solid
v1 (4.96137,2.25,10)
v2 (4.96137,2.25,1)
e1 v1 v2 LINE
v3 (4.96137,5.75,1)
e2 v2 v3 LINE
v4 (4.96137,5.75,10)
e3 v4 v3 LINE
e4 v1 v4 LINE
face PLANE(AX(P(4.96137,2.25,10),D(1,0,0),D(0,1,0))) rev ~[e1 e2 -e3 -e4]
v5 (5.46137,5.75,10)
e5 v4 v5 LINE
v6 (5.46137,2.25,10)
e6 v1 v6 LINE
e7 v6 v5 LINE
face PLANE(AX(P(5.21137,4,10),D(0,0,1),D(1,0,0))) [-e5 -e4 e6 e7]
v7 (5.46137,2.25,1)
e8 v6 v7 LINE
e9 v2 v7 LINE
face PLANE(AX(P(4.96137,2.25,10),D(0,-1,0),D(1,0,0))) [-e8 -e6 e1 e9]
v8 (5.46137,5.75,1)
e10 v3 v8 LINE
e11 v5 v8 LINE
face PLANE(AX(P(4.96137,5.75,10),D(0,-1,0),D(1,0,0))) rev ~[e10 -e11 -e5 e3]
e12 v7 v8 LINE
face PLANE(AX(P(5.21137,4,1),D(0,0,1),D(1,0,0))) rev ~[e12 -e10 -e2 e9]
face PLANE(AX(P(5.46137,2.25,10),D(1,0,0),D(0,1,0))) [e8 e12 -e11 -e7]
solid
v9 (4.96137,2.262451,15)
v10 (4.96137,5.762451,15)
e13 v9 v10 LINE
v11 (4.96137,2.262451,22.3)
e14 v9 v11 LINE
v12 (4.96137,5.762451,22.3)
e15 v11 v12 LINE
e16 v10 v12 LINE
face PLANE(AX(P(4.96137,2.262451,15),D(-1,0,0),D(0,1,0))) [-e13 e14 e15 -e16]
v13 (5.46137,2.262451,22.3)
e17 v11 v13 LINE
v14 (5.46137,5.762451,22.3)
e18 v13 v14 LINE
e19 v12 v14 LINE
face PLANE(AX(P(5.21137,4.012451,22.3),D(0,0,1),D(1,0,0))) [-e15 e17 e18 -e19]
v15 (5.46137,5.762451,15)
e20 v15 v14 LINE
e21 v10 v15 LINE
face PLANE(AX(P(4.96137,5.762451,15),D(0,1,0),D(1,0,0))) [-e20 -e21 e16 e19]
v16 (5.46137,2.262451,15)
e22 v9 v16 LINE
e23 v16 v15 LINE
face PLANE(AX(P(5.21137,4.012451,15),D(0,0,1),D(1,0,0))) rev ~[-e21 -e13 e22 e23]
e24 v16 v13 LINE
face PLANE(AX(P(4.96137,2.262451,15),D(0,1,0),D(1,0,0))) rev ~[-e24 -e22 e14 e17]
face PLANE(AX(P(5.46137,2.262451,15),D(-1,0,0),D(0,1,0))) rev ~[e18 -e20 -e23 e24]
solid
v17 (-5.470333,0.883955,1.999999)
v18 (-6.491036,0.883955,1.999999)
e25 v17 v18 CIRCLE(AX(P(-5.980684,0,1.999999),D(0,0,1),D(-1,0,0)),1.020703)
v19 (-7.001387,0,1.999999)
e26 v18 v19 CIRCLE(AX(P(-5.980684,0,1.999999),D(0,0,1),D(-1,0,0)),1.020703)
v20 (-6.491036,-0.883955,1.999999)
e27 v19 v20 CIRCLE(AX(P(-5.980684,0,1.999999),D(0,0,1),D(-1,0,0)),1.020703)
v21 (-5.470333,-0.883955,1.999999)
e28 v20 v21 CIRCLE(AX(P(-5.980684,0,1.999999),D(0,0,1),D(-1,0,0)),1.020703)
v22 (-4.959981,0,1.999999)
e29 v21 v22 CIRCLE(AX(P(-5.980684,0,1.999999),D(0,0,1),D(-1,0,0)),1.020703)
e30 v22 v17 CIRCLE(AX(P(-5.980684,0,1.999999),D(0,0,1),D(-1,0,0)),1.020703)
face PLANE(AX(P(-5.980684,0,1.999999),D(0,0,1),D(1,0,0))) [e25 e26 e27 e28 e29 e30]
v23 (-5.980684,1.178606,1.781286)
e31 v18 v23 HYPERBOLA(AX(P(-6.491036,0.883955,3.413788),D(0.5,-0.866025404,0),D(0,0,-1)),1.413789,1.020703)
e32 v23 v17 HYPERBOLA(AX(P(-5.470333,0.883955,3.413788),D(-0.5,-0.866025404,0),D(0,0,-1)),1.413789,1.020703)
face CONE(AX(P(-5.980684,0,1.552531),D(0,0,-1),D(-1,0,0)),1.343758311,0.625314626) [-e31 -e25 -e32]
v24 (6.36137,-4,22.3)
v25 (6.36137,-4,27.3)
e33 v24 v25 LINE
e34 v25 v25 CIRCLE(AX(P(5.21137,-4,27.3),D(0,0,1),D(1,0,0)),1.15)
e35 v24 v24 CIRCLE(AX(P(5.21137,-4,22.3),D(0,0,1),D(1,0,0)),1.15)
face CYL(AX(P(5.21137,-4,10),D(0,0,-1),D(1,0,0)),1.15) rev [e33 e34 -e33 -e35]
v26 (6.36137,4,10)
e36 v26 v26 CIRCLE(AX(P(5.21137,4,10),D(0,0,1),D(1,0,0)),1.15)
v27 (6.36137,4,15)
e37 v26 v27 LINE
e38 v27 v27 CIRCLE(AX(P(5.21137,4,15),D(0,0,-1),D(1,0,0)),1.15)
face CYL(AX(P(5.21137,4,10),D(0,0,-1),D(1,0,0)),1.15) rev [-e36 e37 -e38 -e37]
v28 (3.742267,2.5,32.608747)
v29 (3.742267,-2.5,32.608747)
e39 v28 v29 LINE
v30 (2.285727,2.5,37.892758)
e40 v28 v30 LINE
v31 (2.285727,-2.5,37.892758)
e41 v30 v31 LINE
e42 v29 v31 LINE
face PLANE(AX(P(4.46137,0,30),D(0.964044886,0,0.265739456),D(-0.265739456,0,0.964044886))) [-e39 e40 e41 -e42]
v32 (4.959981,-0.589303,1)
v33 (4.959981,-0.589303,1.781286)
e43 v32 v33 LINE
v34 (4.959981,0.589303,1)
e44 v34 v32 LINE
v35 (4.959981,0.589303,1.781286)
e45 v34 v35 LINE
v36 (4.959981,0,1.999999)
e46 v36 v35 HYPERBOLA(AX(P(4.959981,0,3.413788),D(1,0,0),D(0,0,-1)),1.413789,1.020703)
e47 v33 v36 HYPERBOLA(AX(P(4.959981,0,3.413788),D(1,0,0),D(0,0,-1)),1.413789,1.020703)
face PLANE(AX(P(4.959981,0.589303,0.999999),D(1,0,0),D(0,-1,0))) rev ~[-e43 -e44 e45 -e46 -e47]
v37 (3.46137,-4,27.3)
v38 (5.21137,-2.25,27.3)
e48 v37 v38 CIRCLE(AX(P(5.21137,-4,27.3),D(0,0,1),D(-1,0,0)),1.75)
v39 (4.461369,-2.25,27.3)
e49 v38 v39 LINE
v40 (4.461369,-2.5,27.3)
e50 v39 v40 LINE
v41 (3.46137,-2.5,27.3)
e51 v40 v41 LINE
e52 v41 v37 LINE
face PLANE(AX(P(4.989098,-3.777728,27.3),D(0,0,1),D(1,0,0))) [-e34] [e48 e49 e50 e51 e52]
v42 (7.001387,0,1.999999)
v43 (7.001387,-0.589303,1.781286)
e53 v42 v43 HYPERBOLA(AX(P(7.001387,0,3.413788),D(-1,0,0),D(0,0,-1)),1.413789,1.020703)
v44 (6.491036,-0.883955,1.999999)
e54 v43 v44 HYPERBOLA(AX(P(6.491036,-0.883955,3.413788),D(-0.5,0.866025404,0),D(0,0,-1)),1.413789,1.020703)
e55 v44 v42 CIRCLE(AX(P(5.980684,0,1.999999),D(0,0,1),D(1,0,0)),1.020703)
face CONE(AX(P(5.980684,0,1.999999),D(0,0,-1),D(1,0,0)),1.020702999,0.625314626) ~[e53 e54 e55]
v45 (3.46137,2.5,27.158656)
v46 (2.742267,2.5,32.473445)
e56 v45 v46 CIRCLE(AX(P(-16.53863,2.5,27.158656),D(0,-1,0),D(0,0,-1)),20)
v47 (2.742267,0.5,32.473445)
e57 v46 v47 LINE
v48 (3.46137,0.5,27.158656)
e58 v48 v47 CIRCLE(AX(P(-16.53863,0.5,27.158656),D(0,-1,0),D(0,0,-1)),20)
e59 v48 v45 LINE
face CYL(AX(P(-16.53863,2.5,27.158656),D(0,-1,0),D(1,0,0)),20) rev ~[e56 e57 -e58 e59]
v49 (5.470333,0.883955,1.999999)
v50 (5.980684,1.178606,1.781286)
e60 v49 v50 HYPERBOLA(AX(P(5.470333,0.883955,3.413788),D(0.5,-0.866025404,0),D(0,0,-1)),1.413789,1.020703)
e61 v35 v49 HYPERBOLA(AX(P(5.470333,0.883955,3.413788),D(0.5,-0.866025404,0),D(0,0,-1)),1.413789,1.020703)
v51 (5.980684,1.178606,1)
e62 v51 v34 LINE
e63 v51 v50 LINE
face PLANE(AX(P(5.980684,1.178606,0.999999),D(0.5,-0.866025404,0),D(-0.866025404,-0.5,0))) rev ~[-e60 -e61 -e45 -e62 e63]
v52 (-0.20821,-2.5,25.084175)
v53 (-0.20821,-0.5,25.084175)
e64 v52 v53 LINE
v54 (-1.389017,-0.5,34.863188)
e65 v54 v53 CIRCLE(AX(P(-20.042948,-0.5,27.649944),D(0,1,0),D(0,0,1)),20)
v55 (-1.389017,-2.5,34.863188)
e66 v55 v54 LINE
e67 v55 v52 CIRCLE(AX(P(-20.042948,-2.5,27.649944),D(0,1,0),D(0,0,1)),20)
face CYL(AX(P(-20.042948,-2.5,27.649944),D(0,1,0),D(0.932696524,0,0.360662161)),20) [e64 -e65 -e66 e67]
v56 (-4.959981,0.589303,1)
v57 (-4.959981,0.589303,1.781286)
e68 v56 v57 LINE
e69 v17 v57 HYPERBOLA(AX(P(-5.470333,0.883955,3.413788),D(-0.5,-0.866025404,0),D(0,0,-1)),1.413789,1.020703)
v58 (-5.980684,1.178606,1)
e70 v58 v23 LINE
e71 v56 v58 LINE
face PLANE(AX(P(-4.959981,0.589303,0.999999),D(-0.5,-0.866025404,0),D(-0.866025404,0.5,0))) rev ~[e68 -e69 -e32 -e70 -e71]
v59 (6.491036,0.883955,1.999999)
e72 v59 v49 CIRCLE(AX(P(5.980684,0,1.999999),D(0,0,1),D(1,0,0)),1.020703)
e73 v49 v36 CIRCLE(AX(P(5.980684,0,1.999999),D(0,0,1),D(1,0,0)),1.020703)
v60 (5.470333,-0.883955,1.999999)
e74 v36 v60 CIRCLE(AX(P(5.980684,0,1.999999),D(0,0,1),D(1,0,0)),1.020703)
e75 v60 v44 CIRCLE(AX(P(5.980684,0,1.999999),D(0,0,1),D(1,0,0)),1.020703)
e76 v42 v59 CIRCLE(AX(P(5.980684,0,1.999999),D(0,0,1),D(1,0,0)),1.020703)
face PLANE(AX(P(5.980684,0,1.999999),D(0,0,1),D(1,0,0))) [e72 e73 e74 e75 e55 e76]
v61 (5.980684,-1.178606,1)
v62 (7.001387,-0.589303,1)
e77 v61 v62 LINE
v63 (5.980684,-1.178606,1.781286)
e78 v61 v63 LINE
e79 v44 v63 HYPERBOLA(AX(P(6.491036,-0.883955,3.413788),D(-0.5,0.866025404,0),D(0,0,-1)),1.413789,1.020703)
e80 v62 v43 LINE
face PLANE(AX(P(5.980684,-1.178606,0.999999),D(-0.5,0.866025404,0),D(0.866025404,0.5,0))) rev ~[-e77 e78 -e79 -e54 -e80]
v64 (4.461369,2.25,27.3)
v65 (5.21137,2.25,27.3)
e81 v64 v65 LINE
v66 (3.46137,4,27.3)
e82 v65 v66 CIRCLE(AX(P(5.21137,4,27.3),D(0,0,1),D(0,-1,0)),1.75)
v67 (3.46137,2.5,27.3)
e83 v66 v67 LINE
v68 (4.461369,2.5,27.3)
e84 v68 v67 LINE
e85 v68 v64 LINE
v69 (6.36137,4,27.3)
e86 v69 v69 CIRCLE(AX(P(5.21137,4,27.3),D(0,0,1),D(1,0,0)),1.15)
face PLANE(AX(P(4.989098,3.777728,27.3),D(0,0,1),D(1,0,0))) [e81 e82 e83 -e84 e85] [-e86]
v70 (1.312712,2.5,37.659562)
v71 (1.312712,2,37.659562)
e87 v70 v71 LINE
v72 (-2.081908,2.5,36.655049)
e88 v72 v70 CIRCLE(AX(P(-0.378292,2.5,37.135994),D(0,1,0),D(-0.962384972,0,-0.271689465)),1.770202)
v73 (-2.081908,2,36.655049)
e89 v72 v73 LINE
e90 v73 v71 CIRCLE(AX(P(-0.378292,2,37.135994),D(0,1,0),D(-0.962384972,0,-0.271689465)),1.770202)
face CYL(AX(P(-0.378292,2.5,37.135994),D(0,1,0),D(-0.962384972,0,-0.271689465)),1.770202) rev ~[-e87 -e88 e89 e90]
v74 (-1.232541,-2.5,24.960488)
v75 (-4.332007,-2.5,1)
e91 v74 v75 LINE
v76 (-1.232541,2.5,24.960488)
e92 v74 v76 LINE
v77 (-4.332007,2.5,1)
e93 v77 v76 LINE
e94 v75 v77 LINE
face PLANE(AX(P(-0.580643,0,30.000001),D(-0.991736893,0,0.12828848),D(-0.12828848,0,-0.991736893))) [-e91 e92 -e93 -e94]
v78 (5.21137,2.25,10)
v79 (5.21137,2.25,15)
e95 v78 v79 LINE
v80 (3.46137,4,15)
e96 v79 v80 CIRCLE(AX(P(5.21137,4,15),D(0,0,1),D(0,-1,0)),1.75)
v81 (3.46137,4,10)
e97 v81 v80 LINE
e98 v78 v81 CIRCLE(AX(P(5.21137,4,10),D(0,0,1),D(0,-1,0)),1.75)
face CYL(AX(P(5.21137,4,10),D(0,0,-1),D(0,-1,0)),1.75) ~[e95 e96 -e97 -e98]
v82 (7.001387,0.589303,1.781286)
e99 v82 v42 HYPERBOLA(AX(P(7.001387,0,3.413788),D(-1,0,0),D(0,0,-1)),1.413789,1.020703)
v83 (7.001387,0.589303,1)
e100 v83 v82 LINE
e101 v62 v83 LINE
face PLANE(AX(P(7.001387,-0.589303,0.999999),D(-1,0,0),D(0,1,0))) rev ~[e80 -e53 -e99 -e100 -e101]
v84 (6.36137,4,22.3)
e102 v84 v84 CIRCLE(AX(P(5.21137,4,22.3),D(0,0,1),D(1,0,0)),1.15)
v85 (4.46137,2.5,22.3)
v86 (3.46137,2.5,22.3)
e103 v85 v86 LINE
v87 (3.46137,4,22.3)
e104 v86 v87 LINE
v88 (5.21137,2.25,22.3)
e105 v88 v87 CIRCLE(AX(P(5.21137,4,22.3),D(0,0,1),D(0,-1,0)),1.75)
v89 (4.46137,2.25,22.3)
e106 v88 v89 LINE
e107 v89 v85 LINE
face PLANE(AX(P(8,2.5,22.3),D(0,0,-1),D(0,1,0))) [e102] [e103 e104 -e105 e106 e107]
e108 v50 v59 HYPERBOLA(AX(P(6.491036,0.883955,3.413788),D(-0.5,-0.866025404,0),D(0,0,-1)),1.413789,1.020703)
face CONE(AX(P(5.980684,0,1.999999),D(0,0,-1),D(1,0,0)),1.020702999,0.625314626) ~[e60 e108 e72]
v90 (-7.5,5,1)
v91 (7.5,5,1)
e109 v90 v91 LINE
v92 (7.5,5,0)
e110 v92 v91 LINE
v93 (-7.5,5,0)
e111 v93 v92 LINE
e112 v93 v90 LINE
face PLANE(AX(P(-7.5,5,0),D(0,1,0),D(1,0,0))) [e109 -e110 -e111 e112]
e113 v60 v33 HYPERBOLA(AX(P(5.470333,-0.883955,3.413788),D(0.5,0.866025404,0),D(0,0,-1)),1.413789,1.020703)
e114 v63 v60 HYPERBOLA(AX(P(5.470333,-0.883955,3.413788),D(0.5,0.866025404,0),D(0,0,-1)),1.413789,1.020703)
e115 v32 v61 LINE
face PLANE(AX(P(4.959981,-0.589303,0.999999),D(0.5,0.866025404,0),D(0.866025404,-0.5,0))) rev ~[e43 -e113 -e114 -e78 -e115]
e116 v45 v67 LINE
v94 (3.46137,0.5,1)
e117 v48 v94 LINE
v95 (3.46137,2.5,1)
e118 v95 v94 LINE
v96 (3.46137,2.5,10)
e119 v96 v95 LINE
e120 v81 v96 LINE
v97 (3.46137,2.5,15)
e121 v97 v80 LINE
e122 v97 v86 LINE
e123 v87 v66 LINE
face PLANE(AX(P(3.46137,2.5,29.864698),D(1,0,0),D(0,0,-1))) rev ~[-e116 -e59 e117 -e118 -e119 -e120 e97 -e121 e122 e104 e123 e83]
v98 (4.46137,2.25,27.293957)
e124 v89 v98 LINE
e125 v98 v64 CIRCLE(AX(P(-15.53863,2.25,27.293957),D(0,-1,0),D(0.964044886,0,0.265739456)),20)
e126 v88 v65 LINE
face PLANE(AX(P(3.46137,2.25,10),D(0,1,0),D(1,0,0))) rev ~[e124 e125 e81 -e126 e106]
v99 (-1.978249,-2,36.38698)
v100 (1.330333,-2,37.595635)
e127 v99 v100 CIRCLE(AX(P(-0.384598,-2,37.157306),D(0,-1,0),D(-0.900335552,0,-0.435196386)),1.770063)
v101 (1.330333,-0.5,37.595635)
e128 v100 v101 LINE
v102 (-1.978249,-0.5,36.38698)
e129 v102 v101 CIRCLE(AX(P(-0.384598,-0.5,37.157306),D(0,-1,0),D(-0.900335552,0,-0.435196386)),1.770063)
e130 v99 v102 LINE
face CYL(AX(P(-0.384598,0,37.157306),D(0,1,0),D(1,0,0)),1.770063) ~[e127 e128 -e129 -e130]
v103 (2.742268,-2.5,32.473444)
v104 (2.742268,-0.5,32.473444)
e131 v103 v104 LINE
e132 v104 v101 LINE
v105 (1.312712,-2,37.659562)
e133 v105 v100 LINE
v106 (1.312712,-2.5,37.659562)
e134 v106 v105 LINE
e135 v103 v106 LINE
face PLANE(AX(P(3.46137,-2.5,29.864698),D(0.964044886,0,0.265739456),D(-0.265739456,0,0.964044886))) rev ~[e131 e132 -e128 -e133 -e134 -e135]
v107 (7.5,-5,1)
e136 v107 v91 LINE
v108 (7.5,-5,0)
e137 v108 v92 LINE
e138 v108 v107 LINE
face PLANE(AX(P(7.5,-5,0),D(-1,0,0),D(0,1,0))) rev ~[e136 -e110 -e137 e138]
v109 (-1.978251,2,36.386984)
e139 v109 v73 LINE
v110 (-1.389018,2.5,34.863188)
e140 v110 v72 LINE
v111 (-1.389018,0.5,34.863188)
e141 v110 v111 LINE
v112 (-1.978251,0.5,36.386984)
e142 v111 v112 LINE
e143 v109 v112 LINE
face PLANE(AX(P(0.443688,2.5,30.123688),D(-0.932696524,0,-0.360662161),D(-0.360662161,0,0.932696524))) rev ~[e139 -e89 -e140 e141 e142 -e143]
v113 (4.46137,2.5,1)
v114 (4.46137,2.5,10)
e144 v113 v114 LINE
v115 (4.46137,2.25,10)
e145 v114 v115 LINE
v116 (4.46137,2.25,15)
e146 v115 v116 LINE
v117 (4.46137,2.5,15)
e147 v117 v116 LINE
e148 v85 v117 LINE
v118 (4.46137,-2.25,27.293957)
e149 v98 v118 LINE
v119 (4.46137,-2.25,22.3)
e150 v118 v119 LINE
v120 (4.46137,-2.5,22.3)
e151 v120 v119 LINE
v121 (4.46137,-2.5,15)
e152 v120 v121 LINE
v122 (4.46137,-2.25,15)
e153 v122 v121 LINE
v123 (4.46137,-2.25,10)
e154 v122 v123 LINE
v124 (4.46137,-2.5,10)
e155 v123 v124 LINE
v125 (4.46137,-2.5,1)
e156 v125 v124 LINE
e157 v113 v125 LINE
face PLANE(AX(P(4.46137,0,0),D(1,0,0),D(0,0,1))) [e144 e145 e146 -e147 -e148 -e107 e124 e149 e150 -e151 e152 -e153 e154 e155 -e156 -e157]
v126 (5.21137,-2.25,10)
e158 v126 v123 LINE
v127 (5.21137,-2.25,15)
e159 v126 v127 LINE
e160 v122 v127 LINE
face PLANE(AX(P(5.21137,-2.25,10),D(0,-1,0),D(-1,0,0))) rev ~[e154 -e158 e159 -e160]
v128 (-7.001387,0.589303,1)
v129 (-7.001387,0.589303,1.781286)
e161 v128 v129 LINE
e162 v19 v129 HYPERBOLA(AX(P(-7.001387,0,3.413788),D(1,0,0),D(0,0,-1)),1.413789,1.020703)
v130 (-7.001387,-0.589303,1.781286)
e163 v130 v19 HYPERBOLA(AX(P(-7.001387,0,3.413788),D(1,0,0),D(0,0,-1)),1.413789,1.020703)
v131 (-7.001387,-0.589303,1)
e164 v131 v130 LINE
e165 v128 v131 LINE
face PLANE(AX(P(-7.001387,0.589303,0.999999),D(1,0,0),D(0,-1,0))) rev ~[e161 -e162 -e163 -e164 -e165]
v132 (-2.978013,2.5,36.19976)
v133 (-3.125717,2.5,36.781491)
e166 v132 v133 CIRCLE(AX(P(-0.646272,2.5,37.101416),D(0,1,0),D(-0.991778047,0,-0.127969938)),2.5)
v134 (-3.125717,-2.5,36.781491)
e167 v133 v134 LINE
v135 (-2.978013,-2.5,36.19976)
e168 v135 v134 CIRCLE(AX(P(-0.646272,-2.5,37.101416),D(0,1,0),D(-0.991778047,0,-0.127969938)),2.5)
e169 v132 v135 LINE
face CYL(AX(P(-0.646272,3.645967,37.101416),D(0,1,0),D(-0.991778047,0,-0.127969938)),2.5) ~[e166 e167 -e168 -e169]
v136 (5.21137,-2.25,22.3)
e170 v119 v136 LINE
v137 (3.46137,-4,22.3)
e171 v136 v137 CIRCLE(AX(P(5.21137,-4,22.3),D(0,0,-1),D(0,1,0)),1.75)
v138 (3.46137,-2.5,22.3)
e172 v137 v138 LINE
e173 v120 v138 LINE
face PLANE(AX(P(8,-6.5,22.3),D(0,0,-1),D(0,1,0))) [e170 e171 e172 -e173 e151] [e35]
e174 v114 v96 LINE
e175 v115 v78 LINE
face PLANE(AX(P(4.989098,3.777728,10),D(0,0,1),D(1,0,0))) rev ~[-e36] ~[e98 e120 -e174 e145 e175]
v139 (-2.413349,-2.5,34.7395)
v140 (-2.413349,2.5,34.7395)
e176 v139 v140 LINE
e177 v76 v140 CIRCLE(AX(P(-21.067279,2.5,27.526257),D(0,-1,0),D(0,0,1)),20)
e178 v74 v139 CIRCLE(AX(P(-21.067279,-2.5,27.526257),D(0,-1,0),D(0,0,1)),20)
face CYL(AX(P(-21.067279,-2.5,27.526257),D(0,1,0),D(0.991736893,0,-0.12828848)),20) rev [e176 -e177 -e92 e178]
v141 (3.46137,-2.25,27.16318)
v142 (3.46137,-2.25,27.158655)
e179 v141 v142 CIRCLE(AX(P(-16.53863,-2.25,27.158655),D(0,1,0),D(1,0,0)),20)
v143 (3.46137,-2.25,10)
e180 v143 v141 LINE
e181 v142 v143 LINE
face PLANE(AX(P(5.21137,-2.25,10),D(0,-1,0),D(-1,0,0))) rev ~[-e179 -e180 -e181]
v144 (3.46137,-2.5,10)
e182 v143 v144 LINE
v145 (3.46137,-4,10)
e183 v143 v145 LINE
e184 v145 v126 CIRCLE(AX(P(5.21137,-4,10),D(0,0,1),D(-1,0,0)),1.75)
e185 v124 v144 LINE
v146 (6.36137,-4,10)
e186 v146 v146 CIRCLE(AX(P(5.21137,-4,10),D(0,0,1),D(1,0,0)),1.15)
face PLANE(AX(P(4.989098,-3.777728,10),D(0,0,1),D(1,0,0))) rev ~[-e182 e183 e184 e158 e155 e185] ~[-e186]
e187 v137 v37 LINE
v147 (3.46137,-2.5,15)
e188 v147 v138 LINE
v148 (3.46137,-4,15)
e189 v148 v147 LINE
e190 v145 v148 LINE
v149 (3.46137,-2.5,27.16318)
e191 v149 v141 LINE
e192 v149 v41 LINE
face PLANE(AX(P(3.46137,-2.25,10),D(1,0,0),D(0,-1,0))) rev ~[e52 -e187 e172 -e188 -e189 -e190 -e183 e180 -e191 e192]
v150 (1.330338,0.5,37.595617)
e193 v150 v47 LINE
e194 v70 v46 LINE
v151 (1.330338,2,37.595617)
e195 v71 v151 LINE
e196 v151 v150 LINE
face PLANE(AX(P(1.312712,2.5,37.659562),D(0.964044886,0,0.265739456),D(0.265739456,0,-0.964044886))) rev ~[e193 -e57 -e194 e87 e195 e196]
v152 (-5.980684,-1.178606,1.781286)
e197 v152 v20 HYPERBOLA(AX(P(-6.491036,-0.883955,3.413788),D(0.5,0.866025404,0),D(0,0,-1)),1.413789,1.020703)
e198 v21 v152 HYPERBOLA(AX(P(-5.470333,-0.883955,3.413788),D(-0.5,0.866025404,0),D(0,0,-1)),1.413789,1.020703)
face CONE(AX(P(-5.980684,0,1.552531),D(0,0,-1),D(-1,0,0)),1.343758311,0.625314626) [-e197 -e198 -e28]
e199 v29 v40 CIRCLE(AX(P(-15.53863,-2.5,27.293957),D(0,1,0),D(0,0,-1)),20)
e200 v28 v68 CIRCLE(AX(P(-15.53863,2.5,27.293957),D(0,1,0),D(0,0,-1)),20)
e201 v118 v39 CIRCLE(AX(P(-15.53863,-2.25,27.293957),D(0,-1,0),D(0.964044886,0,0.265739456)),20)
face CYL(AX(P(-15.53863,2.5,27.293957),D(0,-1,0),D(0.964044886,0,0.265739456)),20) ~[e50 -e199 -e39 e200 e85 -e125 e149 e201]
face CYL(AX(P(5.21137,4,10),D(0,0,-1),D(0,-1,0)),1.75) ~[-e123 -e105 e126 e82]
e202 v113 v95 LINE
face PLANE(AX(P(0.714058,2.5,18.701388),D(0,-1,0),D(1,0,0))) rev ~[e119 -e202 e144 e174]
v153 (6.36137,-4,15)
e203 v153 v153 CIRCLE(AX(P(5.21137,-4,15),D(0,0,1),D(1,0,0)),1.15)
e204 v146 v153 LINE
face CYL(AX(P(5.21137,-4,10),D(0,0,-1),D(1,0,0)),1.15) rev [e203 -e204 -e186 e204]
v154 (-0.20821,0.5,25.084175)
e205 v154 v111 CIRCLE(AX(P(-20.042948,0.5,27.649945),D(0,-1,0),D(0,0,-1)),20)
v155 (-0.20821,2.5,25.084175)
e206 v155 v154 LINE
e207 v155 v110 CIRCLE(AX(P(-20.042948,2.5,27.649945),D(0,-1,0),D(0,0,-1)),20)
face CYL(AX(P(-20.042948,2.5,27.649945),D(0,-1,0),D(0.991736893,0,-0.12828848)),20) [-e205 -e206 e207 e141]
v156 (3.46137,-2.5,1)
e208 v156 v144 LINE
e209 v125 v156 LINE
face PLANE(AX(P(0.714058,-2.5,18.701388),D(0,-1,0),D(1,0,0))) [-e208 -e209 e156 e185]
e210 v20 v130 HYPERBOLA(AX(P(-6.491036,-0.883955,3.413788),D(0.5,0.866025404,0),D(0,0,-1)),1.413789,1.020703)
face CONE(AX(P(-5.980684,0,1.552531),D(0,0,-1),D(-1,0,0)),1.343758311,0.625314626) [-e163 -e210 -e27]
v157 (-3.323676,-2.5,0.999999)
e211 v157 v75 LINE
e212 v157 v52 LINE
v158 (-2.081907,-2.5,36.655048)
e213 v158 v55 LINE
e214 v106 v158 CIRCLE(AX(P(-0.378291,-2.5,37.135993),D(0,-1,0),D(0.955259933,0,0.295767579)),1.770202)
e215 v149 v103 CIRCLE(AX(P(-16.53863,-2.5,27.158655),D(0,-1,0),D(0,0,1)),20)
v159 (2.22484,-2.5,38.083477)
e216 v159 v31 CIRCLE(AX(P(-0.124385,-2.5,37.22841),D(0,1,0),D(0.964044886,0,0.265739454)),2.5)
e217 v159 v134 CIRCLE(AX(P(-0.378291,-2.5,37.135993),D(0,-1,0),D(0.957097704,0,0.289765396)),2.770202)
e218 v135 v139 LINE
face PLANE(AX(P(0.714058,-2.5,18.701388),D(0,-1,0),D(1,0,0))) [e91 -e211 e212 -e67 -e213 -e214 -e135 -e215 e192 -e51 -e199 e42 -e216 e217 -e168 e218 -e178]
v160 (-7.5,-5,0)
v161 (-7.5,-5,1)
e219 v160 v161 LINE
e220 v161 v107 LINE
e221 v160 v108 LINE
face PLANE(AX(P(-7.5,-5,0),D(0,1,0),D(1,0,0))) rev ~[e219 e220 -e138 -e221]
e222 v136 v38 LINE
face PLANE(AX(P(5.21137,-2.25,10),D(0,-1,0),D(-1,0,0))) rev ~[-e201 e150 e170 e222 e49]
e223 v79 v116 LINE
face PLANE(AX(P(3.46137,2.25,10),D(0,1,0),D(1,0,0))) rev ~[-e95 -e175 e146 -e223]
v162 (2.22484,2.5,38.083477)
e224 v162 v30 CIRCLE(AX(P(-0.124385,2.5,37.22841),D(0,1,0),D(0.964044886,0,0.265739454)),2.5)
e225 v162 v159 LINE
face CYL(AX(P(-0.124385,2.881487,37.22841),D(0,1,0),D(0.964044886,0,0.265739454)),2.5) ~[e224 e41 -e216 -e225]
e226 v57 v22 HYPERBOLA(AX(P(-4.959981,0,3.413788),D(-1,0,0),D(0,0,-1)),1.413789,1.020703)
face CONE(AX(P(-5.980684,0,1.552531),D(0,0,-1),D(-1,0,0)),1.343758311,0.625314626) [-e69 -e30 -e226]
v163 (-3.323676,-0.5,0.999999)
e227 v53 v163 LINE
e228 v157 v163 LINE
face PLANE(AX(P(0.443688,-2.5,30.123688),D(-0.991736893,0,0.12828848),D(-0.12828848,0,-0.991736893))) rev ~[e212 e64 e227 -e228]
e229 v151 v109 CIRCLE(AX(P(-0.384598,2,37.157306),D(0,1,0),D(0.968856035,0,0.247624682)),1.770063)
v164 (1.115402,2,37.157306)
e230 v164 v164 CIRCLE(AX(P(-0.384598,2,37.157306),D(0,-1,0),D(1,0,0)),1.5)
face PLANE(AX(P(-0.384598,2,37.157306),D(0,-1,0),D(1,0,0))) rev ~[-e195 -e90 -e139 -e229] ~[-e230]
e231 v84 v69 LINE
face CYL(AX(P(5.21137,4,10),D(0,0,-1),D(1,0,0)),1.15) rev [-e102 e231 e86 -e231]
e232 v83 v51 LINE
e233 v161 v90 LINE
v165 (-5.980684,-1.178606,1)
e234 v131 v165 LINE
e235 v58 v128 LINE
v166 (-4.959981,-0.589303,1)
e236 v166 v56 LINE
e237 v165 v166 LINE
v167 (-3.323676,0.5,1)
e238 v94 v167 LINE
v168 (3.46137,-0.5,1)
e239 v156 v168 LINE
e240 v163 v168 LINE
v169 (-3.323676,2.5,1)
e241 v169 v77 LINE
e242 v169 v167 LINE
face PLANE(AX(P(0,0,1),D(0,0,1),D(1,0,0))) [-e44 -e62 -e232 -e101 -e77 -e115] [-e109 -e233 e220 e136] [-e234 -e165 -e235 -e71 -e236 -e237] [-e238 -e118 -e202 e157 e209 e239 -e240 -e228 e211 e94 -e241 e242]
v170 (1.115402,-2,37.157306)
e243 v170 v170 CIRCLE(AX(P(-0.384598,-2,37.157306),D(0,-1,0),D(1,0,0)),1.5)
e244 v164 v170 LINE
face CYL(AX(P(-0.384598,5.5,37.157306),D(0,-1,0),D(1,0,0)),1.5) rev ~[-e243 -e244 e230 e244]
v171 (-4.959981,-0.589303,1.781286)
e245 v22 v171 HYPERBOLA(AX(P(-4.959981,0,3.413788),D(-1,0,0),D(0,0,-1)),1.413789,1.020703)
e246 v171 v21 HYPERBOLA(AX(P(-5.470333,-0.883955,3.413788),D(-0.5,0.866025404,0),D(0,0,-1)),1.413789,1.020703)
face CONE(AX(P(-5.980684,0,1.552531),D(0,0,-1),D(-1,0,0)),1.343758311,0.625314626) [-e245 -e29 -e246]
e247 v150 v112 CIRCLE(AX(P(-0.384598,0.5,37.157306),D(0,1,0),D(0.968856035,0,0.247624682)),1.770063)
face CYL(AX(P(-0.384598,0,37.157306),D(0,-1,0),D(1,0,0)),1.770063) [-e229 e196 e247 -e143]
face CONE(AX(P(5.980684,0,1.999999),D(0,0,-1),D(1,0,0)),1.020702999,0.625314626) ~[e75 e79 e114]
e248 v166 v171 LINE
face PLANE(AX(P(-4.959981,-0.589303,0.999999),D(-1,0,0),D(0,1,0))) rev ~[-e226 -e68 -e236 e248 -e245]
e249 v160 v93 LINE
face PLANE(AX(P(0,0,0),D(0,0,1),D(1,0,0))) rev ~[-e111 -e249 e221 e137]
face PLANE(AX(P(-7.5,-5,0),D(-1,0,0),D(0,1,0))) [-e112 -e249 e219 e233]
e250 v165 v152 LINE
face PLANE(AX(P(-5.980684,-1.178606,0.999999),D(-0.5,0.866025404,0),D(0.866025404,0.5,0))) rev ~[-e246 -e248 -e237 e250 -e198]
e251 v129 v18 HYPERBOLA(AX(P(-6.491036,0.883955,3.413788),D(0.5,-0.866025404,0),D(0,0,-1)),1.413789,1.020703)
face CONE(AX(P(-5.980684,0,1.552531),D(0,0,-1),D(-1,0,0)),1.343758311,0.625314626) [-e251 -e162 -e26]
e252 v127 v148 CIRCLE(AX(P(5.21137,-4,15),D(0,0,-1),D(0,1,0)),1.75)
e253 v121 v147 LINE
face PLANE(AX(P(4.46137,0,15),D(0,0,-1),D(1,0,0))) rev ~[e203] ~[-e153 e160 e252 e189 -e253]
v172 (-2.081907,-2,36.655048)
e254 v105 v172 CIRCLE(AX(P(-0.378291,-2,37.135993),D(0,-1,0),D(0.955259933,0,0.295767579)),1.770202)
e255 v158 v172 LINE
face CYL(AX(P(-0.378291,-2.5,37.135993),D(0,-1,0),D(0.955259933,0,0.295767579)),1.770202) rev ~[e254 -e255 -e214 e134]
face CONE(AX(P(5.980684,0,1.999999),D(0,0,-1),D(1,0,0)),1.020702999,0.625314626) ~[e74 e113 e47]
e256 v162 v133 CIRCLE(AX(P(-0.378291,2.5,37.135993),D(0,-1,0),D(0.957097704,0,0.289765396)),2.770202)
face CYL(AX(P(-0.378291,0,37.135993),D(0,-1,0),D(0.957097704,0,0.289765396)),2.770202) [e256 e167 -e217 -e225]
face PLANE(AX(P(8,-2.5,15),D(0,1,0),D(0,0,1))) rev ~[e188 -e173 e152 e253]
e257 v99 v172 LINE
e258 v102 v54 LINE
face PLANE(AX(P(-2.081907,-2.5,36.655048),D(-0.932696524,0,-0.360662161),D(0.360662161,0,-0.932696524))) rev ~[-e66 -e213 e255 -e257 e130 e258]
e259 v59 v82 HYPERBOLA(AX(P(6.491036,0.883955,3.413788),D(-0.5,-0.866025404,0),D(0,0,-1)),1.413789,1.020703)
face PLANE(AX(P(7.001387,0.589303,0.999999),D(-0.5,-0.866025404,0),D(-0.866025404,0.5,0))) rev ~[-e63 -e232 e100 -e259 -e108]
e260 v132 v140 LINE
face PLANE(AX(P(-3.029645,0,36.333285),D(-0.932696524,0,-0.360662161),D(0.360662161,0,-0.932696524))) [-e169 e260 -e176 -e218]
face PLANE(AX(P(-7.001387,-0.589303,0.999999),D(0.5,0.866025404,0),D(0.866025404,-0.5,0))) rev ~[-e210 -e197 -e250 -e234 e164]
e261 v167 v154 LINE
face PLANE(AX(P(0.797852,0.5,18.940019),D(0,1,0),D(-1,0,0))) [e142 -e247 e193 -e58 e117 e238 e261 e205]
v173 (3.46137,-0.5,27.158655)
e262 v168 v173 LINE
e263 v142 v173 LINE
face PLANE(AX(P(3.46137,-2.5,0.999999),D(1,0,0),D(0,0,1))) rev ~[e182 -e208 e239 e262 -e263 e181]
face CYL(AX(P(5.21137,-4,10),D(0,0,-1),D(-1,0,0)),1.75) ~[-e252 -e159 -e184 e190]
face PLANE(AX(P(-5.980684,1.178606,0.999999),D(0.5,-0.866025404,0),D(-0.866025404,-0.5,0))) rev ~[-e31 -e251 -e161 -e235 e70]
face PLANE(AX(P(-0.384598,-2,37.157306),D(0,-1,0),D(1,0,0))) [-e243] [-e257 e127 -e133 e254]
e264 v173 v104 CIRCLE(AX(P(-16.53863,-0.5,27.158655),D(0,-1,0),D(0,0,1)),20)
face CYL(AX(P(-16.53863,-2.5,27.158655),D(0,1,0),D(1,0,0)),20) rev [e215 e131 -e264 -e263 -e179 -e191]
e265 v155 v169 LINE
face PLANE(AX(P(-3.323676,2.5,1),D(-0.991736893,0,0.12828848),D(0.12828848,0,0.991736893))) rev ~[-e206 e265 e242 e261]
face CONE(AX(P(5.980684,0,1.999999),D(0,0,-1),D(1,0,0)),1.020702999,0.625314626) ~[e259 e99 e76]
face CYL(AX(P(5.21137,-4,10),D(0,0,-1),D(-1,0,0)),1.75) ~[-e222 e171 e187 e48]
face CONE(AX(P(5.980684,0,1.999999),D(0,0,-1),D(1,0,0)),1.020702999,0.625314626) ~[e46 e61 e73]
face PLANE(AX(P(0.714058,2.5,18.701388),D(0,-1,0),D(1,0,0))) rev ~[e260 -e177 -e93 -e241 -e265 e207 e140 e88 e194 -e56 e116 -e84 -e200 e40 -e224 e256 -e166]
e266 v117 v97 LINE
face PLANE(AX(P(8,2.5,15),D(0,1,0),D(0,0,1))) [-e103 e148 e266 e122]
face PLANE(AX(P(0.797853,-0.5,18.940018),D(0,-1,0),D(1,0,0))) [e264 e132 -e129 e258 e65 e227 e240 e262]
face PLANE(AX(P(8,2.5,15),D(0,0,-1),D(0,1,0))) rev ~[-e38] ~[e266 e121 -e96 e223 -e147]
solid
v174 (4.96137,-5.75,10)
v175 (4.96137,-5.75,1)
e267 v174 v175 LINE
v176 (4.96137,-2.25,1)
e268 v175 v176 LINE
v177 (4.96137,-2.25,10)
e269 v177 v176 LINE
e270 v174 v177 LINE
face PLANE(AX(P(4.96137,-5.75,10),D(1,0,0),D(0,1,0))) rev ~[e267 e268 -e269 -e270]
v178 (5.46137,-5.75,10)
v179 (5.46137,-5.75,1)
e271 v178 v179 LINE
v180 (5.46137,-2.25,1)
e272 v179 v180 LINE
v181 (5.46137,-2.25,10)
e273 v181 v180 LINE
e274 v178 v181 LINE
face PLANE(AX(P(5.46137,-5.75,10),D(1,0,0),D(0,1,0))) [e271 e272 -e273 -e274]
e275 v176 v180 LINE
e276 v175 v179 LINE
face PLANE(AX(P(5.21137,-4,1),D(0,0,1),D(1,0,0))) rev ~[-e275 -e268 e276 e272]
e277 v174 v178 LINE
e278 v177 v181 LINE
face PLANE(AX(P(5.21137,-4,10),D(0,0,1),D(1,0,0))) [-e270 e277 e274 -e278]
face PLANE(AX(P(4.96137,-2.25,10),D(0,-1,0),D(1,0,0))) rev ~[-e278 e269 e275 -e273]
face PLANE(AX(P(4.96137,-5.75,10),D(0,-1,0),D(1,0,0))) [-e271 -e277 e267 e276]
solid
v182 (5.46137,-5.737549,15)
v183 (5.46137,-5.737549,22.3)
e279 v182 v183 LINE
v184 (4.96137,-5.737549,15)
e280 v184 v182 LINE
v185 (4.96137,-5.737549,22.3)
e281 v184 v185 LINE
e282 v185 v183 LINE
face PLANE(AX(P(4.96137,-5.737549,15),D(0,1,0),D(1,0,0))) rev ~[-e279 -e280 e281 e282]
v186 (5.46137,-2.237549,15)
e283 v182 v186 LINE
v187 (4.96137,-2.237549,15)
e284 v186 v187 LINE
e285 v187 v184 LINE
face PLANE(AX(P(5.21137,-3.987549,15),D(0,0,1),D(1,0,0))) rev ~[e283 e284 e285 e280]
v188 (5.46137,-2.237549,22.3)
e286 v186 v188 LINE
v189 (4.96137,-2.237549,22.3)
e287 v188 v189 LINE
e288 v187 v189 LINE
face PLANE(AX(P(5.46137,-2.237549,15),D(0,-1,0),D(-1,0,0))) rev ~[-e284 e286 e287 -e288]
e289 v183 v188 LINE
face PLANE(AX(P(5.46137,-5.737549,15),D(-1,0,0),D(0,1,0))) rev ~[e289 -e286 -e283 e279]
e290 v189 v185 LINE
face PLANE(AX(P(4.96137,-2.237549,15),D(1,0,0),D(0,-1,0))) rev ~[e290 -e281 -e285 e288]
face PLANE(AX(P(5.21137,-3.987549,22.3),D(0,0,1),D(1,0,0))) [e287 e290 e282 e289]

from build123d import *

# Parameters (mm, degrees)
F1_DEPTH    = 2.5
F2_R        = 20
F3_T1_DEPTH = 7.2919338558
F3_T3_DEPTH = 5.7629746737
F5_DEPTH    = 2
F6_R        = 20
F8_DEPTH    = 2
F9_W        = 15
F9_H        = 10
F10_DEPTH   = 1
F12_R       = 20
F13_R       = 1.15
F14_DEPTH   = 17.3
F16_W       = 4
F16_H       = 7.3
F17_DEPTH   = 25
F19_D       = 3
F19_DEPTH   = 5
F19_TIP     = 0.9012909285
F20_R       = 1.7700631876
F20_R_2     = 1.5
F21_DEPTH   = 2
F22_W       = 4
F22_H       = 7.3
F23_DEPTH   = 12.5
F24_DEPTH   = 2
F26_DEPTH   = 1
F30_W       = 0.5
F30_H       = 3.5
F31_DEPTH   = 9
F32_W       = 0.5
F32_H       = 3.5
F33_DEPTH   = 7.3


# Not quite as in the source:
# - a fillet or chamfer that OpenCascade refuses, or shapes differently, is made with other operations: its cross-section is extruded or revolved along the edge and cut away or added
# - ends of sketch curves that miss each other by under 0.0002 mm in the source are joined
# - a feature names something its author has since deleted; it is built from what else it names


with BuildPart() as f1:
    # F0 (on Front) → F1 (new body, symmetric)
    with BuildSketch(Plane.XZ):
        with BuildLine():
            Line((-4.461364258, 0), (4.4613697168, 0))
            Line((4.4613697168, 0), (4.4613697168, 30))
            Line((4.4613697168, 30), (2.2730625034, 37.9387021101))
            ThreePointArc((2.2730625034, 37.9387021101), (-1.1809999696, 39.7873473063), (-3.0296451657, 36.3332848334))
            Line((-3.0296451657, 36.3332848334), (-0.5806429216, 30.0000008653))
            Line((-0.5806429216, 30.0000008653), (-4.461364258, 0))
        make_face()
    extrude(amount=F1_DEPTH, both=True)

    # F2
    f2_edges = [f1.edges().sort_by_distance(p)[0] for p in [
        (4.46137, 0, 30),
        (-0.580643, 0, 30.000001),
    ]]
    fillet(f2_edges, radius=F2_R)

    # F3: fillet of radius 2.5 on 3 edges, made by hand

    # F3_s2 → F3_t1 (cut)
    with BuildSketch(Plane.XZ.offset(-3.6459669279)):
        with BuildLine():
            ThreePointArc((-3.1257167168, 36.7814909121), (-3.0693855707, 36.4861770404), (-2.9780129086, 36.1997603554))
            Line((-2.9780129086, 36.1997603554), (-3.0296451657, 36.3332848334))
            ThreePointArc((-3.0296451657, 36.3332848334), (-3.0869674726, 36.5553973342), (-3.1257167168, 36.7814909121))
        make_face()
    extrude(amount=F3_T1_DEPTH, mode=Mode.SUBTRACT)

    # F3_s4 → F3_t3 (cut)
    with BuildSketch(Plane.XZ.offset(-2.8814873369)):
        with BuildLine():
            ThreePointArc((2.2857269032, 37.8927584249), (2.257193358, 37.9887275108), (2.2248400544, 38.0834771409))
            ThreePointArc((2.2248400544, 38.0834771409), (2.2499483239, 38.0114217266), (2.2730625034, 37.9387021101))
            Line((2.2730625034, 37.9387021101), (2.2857269032, 37.8927584249))
        make_face()
    extrude(amount=F3_T3_DEPTH, mode=Mode.SUBTRACT)

    # F4 (on face) → F5 (cut)
    with BuildSketch(Plane.XZ.offset(2.5)):
        with BuildLine():
            Line((-3.3236755119, 0.999999488), (3.4613702287, 0.999999488))
            Line((3.4613702287, 0.999999488), (3.4613702287, 29.8646979397))
            Line((3.4613702287, 29.8646979397), (1.3127120624, 37.6595619399))
            ThreePointArc((1.3127120624, 37.6595619399), (-0.880587822, 38.8334370358), (-2.0819074864, 36.6550481386))
            Line((-2.0819074864, 36.6550481386), (0.4436883577, 30.1236879865))
            Line((0.4436883577, 30.1236879865), (-3.3236755119, 0.999999488))
        make_face()
    extrude(amount=-F5_DEPTH, mode=Mode.SUBTRACT)

    # F6
    f6_edges = [f1.edges().sort_by_distance(p)[0] for p in [
        (0.443688, -1.5, 30.123688),
        (3.46137, -1.5, 29.864698),
    ]]
    fillet(f6_edges, radius=F6_R)

    # F7 (on face) → F8 (cut)
    with BuildSketch(Plane(origin=(0, 2.5, 0), x_dir=(-1, 0, 0), z_dir=(0, 1, 0))):
        with BuildLine():
            Line((-3.4613697168, 29.8646984516), (-3.4613697168, 1))
            Line((-3.4613697168, 1), (3.3236760239, 1))
            Line((3.3236760239, 1), (-0.4436878458, 30.1236884984))
            Line((-0.4436878458, 30.1236884984), (2.0819079984, 36.6550486506))
            ThreePointArc((2.0819079984, 36.6550486506), (0.8805883339, 38.8334375478), (-1.3127115504, 37.6595624519))
            Line((-1.3127115504, 37.6595624519), (-3.4613697168, 29.8646984516))
        make_face()
    extrude(amount=-F8_DEPTH, mode=Mode.SUBTRACT)

    # F9 (on Top) → F10 (join)
    with BuildSketch(Plane.XY):
        Rectangle(F9_W, F9_H)
    extrude(amount=F10_DEPTH)

    # F12
    f12_edges = [f1.edges().sort_by_distance(p)[0] for p in [
        (0.443688, 1.5, 30.123688),
        (3.46137, 1.5, 29.864698),
    ]]
    fillet(f12_edges, radius=F12_R)

    # F13 (on offset) → F14 (join)
    with BuildSketch(Plane.XY.offset(10)):
        with BuildLine():
            ThreePointArc((3.4613697168, -4), (6.4488065838, -5.2374368671), (5.2113697168, -2.25))
            Line((5.2113697168, -2.25), (3.4613697168, -2.25))
            Line((3.4613697168, -2.25), (3.4613697168, -4))
        make_face()
        with Locations((5.2113697168, -4.00000019)):
            Circle(F13_R, mode=Mode.SUBTRACT)
        with BuildLine():
            Line((3.4613697168, 2.25), (5.2113697168, 2.25))
            ThreePointArc((5.2113697168, 2.25), (6.4488065838, 5.2374368671), (3.4613697168, 4))
            Line((3.4613697168, 4), (3.4613697168, 2.25))
        make_face()
        with Locations((5.2113697168, 4.00000019)):
            Circle(F13_R, mode=Mode.SUBTRACT)
    extrude(amount=F14_DEPTH)

    # F16 (on offset) → F17 (cut)
    with BuildSketch(Plane.YZ.offset(8)):
        with Locations((-4.5, 18.65)):
            Rectangle(F16_W, F16_H)
        with Locations((4.5, 18.65)):
            Rectangle(F16_W, F16_H)
    extrude(amount=-F17_DEPTH, mode=Mode.SUBTRACT)

    # F19
    with Locations(Plane(origin=(0, 0.5, 0), x_dir=(-1, 0, 0), z_dir=(0, 1, 0))):
        with Locations((0.384598224, 37.1573055512)):
            Hole(F19_D / 2, depth=F19_DEPTH)
            with Locations((0, 0, -(F19_DEPTH + F19_TIP / 2))):  # 118° drill point
                Cone(0, F19_D / 2, F19_TIP, mode=Mode.SUBTRACT)

    # F20 (on Front) → F21 (join)
    with BuildSketch(Plane.XZ):
        with Locations((-0.384598224, 37.1573055512)):
            Circle(F20_R)
        with Locations((-0.384598224, 37.1573055512)):
            Circle(F20_R_2, mode=Mode.SUBTRACT)
    extrude(amount=F21_DEPTH)

    # F22 (on Front) → F23 (cut, symmetric)
    with BuildSketch(Plane.XZ):
        with Locations((6.4613697168, 18.65)):
            Rectangle(F22_W, F22_H)
    extrude(amount=F23_DEPTH, both=True, mode=Mode.SUBTRACT)

    # F20 (on Front) → F24 (join)
    with BuildSketch(Plane.XZ):
        with Locations((-0.384598224, 37.1573055512)):
            Circle(F20_R)
        with Locations((-0.384598224, 37.1573055512)):
            Circle(F20_R_2, mode=Mode.SUBTRACT)
    extrude(amount=-F24_DEPTH)

    # F25 (on face) → F26 (join)
    with BuildSketch(Plane.XY.offset(0.999999488)):
        Polygon((7.001387421, -0.5893031513), (7.001387421, 0.5893031513), (5.980684422, 1.1786063026), (4.9599814229, 0.5893031513), (4.9599814229, -0.5893031513), (5.980684422, -1.1786063026), align=None)
        Polygon((-5.980684422, -1.1786063026), (-4.9599814229, -0.5893031513), (-4.9599814229, 0.5893031513), (-5.980684422, 1.1786063026), (-7.001387421, 0.5893031513), (-7.001387421, -0.5893031513), align=None)
    extrude(amount=F26_DEPTH)

    # F27 (on Front) → F28 (revolve, cut)
    with BuildSketch(Plane.XZ):
        Polygon((7.3244427331, 1.999999488), (7.001387421, 1.999999488), (7.3244427331, 1.5525314957), align=None)
    revolve(axis=Axis((5.980684422, 0, 1.2804081198), (0, 0, 1)), mode=Mode.SUBTRACT)

    # F27 (on Front) → F29 (revolve, cut)
    with BuildSketch(Plane.XZ):
        Polygon((-7.3244427331, 1.999999488), (-7.3244427331, 1.5525314957), (-7.001387421, 1.999999488), align=None)
    revolve(axis=Axis((-5.980684422, 0, 1.2804081198), (0, 0, 1)), mode=Mode.SUBTRACT)


with BuildPart() as f31:
    # F30 (on offset) → F31 (new body, through all)
    with BuildSketch(Plane.XY.offset(10)):
        with Locations((5.2113697168, 4)):
            Rectangle(F30_W, F30_H)
    extrude(amount=-F31_DEPTH)


with BuildPart() as f31b:
    # F30 (on offset) → F31, piece 2 (new body, through all)
    with BuildSketch(Plane.XY.offset(10)):
        with Locations((5.2113697168, -4)):
            Rectangle(F30_W, F30_H)
    extrude(amount=-F31_DEPTH)


with BuildPart() as f33:
    # F32 (on face) → F33 (new body, through all)
    with BuildSketch(Plane.XY.offset(15)):
        with Locations((5.2113697168, 4.0124509092)):
            Rectangle(F32_W, F32_H)
    extrude(amount=F33_DEPTH)


with BuildPart() as f33b:
    # F32 (on face) → F33, piece 2 (new body, through all)
    with BuildSketch(Plane.XY.offset(15)):
        Polygon((5.4613697168, -4.2375490908), (5.4613697168, -2.2375490908), (4.9613697168, -2.2375490908), (4.9613697168, -4.2375490908), (4.9613697168, -5.7375490908), (5.4613697168, -5.7375490908), align=None)
    extrude(amount=F33_DEPTH)


solid = Compound([f1.part, f31.part, f31b.part, f33.part, f33b.part])
